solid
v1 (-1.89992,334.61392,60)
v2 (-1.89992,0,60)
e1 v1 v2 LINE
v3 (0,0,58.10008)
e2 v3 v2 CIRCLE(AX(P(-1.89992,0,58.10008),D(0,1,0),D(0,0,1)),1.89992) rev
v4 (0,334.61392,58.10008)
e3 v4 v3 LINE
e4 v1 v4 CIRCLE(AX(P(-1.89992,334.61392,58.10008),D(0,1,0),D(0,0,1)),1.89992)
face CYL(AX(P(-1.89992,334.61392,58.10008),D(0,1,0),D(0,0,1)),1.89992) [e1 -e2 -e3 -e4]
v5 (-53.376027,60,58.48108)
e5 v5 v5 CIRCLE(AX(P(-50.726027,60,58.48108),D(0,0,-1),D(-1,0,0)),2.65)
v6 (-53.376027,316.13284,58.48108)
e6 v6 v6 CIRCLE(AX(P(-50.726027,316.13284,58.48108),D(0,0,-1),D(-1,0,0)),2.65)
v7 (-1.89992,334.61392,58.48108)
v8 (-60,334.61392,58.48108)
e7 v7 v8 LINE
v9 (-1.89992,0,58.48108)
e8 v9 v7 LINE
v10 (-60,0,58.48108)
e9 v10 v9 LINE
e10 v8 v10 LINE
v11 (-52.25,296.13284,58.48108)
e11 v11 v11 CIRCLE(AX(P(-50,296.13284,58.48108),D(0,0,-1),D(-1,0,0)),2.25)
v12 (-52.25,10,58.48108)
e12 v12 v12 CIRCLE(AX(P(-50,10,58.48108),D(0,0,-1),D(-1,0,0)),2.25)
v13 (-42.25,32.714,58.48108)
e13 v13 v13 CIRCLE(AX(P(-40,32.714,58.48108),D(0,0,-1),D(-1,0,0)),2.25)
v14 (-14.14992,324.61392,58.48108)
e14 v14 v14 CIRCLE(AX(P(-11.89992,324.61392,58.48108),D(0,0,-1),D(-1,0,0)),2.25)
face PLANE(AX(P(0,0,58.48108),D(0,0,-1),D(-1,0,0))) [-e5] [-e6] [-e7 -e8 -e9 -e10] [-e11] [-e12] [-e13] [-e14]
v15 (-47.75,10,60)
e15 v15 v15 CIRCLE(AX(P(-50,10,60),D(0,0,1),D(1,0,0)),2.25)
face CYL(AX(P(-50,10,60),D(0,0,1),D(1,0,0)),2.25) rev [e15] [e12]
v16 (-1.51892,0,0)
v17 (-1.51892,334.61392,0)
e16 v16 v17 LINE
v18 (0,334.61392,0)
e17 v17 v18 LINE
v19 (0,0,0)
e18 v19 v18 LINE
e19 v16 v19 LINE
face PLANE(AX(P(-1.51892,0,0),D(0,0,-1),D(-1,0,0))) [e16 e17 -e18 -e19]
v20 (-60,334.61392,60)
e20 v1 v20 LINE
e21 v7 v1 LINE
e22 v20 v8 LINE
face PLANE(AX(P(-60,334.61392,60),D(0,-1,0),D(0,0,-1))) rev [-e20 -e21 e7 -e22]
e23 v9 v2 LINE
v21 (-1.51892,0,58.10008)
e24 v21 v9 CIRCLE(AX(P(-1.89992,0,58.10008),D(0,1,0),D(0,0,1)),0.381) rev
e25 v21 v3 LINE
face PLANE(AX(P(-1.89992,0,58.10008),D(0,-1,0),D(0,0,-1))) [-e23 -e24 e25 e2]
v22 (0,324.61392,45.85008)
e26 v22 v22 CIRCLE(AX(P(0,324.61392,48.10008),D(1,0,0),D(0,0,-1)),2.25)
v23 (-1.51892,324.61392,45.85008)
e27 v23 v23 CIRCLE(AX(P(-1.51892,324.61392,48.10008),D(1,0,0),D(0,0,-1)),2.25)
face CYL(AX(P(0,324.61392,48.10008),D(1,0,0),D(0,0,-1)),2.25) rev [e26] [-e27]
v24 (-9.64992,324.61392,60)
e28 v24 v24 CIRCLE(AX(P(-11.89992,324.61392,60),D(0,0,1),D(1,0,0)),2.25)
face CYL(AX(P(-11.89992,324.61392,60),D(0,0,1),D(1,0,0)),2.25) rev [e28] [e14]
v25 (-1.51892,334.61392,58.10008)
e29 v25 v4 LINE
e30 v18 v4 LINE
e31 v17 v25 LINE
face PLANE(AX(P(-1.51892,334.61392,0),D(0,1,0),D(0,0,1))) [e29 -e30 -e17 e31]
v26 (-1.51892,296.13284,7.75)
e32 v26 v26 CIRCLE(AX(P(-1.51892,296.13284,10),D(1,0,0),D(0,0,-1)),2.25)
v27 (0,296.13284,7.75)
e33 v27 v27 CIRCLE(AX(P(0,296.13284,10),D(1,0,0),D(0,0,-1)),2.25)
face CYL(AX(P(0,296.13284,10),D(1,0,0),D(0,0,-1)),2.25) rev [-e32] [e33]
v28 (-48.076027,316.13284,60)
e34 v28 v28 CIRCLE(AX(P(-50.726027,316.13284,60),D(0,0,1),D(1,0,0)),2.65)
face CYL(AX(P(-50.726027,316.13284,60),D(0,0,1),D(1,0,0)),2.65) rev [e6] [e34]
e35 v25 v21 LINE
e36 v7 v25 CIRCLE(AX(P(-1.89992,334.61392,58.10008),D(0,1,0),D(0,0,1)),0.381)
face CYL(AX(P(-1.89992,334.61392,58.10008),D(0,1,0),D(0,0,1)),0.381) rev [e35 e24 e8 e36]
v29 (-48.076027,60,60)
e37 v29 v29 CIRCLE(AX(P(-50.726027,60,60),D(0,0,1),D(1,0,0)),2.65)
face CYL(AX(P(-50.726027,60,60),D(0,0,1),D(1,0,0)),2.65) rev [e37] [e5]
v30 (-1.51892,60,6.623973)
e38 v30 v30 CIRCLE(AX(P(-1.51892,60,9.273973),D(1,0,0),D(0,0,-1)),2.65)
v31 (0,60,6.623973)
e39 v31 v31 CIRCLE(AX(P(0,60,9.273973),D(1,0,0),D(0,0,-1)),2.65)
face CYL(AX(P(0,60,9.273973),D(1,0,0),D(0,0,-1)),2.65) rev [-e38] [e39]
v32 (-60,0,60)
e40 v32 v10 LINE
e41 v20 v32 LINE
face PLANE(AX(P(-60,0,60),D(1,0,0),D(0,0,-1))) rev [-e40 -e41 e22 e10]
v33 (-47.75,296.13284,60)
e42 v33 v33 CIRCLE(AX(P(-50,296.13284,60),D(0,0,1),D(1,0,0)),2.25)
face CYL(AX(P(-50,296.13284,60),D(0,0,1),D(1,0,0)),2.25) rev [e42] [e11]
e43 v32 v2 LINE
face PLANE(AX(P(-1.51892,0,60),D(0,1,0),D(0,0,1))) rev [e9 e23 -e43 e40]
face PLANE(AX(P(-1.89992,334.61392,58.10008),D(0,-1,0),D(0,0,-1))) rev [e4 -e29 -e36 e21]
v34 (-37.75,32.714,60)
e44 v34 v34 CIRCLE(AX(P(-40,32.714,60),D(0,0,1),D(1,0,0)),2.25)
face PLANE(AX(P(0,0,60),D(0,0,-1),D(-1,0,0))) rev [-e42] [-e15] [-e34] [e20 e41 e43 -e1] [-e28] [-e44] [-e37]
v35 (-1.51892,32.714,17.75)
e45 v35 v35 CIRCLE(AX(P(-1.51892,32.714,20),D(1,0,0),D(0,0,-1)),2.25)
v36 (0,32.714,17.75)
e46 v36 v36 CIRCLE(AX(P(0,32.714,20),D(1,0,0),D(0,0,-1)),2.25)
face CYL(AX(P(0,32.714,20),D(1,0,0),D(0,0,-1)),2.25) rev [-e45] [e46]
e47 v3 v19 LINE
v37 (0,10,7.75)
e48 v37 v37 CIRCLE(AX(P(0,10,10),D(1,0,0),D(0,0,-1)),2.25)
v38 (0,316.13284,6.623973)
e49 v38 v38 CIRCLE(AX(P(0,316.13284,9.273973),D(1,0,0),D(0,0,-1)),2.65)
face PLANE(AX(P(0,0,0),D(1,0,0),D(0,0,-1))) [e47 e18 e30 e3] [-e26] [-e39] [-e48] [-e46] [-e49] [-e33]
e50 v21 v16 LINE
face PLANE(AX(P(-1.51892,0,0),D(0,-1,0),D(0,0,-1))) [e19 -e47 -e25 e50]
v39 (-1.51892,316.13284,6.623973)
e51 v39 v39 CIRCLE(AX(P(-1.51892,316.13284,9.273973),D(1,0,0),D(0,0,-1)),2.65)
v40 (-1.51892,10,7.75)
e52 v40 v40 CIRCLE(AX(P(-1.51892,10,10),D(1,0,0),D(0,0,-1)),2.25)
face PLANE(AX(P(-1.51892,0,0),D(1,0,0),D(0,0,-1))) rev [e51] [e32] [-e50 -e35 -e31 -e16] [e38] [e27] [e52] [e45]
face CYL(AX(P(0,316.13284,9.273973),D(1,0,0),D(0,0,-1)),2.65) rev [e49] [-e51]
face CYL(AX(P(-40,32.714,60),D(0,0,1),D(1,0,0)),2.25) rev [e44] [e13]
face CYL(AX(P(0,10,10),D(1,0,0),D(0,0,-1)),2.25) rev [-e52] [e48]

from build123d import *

# Parameters (mm, degrees)
SKETCH1_W                    = 60
SKETCH1_H                    = 334.61392
BASE_FLANGE1_DEPTH           = 1.51892
EDGE_FLANGE1_STRIP_W         = 6.83768
EDGE_FLANGE1_STRIP_H         = 1.51892
EDGE_FLANGE1_STRIP_CUT_DEPTH = 334.61392
EDGE_FLANGE1_DEPTH           = 334.61392
M5_CLEARANCE_HOLE1_D         = 5.3
M5_CLEARANCE_HOLE2_D         = 5.3
M4_CLEARANCE_HOLE1_D         = 4.5
M4_CLEARANCE_HOLE2_D         = 4.5


# Sheet-metal steps are written as plain solids
with BuildPart() as part:
    # Sketch1 → Base-Flange1 (new body)
    with BuildSketch(Plane(origin=(0, 0, 0), x_dir=(0, 0, -1), z_dir=(1, 0, 0))):
        with Locations((-30, 167.30696)):
            Rectangle(SKETCH1_W, SKETCH1_H)
    extrude(amount=-BASE_FLANGE1_DEPTH)

    # Edge-Flange1 strip (across the edge) → Edge-Flange1 strip cut (cut)
    with BuildSketch(Plane(origin=(-1.51892, 0, 60), x_dir=(0, 0, -1), z_dir=(0, 1, 0))):
        with Locations((-1.51892, -0.75946)):
            Rectangle(EDGE_FLANGE1_STRIP_W, EDGE_FLANGE1_STRIP_H)
    extrude(amount=EDGE_FLANGE1_STRIP_CUT_DEPTH, mode=Mode.SUBTRACT)

    # Edge-Flange1 section (across the edge) → Edge-Flange1 (add)
    with BuildSketch(Plane(origin=(-1.51892, 0, 60), x_dir=(0, 0, -1), z_dir=(0, 1, 0))):
        with BuildLine():
            Line((0, 0.381), (0, 58.48108))
            Line((0, 58.48108), (1.51892, 58.48108))
            Line((1.51892, 58.48108), (1.51892, 0.381))
            ThreePointArc((1.51892, 0.381), (1.630512316, 0.111592316), (1.89992, 0))
            Line((1.89992, 0), (1.89992, -1.51892))
            ThreePointArc((1.89992, -1.51892), (0.556473684, -0.962446316), (0, 0.381))
        make_face()
    extrude(amount=EDGE_FLANGE1_DEPTH)

    # M5 Clearance Hole1 (through all)
    with Locations(Plane.XY.offset(60)):
        with Locations((-50.726027, 60), (-50.726027, 316.13284)):
            Hole(M5_CLEARANCE_HOLE1_D / 2)

    # M5 Clearance Hole2 (through all)
    with Locations(Plane(origin=(0, 0, 0), x_dir=(0, 0, -1), z_dir=(1, 0, 0))):
        with Locations((-9.273973, 60), (-9.273973, 316.13284)):
            Hole(M5_CLEARANCE_HOLE2_D / 2)

    # M4 Clearance Hole1 (through all)
    with Locations(Plane.XY.offset(60)):
        with Locations((-50, 296.13284), (-11.89992, 324.61392), (-50, 10), (-40, 32.714)):
            Hole(M4_CLEARANCE_HOLE1_D / 2)

    # M4 Clearance Hole2 (through all)
    with Locations(Plane(origin=(0, 0, 0), x_dir=(0, 0, -1), z_dir=(1, 0, 0))):
        with Locations((-10, 296.13284), (-48.10008, 324.61392), (-10, 10), (-20, 32.714)):
            Hole(M4_CLEARANCE_HOLE2_D / 2)


solid = part.part
